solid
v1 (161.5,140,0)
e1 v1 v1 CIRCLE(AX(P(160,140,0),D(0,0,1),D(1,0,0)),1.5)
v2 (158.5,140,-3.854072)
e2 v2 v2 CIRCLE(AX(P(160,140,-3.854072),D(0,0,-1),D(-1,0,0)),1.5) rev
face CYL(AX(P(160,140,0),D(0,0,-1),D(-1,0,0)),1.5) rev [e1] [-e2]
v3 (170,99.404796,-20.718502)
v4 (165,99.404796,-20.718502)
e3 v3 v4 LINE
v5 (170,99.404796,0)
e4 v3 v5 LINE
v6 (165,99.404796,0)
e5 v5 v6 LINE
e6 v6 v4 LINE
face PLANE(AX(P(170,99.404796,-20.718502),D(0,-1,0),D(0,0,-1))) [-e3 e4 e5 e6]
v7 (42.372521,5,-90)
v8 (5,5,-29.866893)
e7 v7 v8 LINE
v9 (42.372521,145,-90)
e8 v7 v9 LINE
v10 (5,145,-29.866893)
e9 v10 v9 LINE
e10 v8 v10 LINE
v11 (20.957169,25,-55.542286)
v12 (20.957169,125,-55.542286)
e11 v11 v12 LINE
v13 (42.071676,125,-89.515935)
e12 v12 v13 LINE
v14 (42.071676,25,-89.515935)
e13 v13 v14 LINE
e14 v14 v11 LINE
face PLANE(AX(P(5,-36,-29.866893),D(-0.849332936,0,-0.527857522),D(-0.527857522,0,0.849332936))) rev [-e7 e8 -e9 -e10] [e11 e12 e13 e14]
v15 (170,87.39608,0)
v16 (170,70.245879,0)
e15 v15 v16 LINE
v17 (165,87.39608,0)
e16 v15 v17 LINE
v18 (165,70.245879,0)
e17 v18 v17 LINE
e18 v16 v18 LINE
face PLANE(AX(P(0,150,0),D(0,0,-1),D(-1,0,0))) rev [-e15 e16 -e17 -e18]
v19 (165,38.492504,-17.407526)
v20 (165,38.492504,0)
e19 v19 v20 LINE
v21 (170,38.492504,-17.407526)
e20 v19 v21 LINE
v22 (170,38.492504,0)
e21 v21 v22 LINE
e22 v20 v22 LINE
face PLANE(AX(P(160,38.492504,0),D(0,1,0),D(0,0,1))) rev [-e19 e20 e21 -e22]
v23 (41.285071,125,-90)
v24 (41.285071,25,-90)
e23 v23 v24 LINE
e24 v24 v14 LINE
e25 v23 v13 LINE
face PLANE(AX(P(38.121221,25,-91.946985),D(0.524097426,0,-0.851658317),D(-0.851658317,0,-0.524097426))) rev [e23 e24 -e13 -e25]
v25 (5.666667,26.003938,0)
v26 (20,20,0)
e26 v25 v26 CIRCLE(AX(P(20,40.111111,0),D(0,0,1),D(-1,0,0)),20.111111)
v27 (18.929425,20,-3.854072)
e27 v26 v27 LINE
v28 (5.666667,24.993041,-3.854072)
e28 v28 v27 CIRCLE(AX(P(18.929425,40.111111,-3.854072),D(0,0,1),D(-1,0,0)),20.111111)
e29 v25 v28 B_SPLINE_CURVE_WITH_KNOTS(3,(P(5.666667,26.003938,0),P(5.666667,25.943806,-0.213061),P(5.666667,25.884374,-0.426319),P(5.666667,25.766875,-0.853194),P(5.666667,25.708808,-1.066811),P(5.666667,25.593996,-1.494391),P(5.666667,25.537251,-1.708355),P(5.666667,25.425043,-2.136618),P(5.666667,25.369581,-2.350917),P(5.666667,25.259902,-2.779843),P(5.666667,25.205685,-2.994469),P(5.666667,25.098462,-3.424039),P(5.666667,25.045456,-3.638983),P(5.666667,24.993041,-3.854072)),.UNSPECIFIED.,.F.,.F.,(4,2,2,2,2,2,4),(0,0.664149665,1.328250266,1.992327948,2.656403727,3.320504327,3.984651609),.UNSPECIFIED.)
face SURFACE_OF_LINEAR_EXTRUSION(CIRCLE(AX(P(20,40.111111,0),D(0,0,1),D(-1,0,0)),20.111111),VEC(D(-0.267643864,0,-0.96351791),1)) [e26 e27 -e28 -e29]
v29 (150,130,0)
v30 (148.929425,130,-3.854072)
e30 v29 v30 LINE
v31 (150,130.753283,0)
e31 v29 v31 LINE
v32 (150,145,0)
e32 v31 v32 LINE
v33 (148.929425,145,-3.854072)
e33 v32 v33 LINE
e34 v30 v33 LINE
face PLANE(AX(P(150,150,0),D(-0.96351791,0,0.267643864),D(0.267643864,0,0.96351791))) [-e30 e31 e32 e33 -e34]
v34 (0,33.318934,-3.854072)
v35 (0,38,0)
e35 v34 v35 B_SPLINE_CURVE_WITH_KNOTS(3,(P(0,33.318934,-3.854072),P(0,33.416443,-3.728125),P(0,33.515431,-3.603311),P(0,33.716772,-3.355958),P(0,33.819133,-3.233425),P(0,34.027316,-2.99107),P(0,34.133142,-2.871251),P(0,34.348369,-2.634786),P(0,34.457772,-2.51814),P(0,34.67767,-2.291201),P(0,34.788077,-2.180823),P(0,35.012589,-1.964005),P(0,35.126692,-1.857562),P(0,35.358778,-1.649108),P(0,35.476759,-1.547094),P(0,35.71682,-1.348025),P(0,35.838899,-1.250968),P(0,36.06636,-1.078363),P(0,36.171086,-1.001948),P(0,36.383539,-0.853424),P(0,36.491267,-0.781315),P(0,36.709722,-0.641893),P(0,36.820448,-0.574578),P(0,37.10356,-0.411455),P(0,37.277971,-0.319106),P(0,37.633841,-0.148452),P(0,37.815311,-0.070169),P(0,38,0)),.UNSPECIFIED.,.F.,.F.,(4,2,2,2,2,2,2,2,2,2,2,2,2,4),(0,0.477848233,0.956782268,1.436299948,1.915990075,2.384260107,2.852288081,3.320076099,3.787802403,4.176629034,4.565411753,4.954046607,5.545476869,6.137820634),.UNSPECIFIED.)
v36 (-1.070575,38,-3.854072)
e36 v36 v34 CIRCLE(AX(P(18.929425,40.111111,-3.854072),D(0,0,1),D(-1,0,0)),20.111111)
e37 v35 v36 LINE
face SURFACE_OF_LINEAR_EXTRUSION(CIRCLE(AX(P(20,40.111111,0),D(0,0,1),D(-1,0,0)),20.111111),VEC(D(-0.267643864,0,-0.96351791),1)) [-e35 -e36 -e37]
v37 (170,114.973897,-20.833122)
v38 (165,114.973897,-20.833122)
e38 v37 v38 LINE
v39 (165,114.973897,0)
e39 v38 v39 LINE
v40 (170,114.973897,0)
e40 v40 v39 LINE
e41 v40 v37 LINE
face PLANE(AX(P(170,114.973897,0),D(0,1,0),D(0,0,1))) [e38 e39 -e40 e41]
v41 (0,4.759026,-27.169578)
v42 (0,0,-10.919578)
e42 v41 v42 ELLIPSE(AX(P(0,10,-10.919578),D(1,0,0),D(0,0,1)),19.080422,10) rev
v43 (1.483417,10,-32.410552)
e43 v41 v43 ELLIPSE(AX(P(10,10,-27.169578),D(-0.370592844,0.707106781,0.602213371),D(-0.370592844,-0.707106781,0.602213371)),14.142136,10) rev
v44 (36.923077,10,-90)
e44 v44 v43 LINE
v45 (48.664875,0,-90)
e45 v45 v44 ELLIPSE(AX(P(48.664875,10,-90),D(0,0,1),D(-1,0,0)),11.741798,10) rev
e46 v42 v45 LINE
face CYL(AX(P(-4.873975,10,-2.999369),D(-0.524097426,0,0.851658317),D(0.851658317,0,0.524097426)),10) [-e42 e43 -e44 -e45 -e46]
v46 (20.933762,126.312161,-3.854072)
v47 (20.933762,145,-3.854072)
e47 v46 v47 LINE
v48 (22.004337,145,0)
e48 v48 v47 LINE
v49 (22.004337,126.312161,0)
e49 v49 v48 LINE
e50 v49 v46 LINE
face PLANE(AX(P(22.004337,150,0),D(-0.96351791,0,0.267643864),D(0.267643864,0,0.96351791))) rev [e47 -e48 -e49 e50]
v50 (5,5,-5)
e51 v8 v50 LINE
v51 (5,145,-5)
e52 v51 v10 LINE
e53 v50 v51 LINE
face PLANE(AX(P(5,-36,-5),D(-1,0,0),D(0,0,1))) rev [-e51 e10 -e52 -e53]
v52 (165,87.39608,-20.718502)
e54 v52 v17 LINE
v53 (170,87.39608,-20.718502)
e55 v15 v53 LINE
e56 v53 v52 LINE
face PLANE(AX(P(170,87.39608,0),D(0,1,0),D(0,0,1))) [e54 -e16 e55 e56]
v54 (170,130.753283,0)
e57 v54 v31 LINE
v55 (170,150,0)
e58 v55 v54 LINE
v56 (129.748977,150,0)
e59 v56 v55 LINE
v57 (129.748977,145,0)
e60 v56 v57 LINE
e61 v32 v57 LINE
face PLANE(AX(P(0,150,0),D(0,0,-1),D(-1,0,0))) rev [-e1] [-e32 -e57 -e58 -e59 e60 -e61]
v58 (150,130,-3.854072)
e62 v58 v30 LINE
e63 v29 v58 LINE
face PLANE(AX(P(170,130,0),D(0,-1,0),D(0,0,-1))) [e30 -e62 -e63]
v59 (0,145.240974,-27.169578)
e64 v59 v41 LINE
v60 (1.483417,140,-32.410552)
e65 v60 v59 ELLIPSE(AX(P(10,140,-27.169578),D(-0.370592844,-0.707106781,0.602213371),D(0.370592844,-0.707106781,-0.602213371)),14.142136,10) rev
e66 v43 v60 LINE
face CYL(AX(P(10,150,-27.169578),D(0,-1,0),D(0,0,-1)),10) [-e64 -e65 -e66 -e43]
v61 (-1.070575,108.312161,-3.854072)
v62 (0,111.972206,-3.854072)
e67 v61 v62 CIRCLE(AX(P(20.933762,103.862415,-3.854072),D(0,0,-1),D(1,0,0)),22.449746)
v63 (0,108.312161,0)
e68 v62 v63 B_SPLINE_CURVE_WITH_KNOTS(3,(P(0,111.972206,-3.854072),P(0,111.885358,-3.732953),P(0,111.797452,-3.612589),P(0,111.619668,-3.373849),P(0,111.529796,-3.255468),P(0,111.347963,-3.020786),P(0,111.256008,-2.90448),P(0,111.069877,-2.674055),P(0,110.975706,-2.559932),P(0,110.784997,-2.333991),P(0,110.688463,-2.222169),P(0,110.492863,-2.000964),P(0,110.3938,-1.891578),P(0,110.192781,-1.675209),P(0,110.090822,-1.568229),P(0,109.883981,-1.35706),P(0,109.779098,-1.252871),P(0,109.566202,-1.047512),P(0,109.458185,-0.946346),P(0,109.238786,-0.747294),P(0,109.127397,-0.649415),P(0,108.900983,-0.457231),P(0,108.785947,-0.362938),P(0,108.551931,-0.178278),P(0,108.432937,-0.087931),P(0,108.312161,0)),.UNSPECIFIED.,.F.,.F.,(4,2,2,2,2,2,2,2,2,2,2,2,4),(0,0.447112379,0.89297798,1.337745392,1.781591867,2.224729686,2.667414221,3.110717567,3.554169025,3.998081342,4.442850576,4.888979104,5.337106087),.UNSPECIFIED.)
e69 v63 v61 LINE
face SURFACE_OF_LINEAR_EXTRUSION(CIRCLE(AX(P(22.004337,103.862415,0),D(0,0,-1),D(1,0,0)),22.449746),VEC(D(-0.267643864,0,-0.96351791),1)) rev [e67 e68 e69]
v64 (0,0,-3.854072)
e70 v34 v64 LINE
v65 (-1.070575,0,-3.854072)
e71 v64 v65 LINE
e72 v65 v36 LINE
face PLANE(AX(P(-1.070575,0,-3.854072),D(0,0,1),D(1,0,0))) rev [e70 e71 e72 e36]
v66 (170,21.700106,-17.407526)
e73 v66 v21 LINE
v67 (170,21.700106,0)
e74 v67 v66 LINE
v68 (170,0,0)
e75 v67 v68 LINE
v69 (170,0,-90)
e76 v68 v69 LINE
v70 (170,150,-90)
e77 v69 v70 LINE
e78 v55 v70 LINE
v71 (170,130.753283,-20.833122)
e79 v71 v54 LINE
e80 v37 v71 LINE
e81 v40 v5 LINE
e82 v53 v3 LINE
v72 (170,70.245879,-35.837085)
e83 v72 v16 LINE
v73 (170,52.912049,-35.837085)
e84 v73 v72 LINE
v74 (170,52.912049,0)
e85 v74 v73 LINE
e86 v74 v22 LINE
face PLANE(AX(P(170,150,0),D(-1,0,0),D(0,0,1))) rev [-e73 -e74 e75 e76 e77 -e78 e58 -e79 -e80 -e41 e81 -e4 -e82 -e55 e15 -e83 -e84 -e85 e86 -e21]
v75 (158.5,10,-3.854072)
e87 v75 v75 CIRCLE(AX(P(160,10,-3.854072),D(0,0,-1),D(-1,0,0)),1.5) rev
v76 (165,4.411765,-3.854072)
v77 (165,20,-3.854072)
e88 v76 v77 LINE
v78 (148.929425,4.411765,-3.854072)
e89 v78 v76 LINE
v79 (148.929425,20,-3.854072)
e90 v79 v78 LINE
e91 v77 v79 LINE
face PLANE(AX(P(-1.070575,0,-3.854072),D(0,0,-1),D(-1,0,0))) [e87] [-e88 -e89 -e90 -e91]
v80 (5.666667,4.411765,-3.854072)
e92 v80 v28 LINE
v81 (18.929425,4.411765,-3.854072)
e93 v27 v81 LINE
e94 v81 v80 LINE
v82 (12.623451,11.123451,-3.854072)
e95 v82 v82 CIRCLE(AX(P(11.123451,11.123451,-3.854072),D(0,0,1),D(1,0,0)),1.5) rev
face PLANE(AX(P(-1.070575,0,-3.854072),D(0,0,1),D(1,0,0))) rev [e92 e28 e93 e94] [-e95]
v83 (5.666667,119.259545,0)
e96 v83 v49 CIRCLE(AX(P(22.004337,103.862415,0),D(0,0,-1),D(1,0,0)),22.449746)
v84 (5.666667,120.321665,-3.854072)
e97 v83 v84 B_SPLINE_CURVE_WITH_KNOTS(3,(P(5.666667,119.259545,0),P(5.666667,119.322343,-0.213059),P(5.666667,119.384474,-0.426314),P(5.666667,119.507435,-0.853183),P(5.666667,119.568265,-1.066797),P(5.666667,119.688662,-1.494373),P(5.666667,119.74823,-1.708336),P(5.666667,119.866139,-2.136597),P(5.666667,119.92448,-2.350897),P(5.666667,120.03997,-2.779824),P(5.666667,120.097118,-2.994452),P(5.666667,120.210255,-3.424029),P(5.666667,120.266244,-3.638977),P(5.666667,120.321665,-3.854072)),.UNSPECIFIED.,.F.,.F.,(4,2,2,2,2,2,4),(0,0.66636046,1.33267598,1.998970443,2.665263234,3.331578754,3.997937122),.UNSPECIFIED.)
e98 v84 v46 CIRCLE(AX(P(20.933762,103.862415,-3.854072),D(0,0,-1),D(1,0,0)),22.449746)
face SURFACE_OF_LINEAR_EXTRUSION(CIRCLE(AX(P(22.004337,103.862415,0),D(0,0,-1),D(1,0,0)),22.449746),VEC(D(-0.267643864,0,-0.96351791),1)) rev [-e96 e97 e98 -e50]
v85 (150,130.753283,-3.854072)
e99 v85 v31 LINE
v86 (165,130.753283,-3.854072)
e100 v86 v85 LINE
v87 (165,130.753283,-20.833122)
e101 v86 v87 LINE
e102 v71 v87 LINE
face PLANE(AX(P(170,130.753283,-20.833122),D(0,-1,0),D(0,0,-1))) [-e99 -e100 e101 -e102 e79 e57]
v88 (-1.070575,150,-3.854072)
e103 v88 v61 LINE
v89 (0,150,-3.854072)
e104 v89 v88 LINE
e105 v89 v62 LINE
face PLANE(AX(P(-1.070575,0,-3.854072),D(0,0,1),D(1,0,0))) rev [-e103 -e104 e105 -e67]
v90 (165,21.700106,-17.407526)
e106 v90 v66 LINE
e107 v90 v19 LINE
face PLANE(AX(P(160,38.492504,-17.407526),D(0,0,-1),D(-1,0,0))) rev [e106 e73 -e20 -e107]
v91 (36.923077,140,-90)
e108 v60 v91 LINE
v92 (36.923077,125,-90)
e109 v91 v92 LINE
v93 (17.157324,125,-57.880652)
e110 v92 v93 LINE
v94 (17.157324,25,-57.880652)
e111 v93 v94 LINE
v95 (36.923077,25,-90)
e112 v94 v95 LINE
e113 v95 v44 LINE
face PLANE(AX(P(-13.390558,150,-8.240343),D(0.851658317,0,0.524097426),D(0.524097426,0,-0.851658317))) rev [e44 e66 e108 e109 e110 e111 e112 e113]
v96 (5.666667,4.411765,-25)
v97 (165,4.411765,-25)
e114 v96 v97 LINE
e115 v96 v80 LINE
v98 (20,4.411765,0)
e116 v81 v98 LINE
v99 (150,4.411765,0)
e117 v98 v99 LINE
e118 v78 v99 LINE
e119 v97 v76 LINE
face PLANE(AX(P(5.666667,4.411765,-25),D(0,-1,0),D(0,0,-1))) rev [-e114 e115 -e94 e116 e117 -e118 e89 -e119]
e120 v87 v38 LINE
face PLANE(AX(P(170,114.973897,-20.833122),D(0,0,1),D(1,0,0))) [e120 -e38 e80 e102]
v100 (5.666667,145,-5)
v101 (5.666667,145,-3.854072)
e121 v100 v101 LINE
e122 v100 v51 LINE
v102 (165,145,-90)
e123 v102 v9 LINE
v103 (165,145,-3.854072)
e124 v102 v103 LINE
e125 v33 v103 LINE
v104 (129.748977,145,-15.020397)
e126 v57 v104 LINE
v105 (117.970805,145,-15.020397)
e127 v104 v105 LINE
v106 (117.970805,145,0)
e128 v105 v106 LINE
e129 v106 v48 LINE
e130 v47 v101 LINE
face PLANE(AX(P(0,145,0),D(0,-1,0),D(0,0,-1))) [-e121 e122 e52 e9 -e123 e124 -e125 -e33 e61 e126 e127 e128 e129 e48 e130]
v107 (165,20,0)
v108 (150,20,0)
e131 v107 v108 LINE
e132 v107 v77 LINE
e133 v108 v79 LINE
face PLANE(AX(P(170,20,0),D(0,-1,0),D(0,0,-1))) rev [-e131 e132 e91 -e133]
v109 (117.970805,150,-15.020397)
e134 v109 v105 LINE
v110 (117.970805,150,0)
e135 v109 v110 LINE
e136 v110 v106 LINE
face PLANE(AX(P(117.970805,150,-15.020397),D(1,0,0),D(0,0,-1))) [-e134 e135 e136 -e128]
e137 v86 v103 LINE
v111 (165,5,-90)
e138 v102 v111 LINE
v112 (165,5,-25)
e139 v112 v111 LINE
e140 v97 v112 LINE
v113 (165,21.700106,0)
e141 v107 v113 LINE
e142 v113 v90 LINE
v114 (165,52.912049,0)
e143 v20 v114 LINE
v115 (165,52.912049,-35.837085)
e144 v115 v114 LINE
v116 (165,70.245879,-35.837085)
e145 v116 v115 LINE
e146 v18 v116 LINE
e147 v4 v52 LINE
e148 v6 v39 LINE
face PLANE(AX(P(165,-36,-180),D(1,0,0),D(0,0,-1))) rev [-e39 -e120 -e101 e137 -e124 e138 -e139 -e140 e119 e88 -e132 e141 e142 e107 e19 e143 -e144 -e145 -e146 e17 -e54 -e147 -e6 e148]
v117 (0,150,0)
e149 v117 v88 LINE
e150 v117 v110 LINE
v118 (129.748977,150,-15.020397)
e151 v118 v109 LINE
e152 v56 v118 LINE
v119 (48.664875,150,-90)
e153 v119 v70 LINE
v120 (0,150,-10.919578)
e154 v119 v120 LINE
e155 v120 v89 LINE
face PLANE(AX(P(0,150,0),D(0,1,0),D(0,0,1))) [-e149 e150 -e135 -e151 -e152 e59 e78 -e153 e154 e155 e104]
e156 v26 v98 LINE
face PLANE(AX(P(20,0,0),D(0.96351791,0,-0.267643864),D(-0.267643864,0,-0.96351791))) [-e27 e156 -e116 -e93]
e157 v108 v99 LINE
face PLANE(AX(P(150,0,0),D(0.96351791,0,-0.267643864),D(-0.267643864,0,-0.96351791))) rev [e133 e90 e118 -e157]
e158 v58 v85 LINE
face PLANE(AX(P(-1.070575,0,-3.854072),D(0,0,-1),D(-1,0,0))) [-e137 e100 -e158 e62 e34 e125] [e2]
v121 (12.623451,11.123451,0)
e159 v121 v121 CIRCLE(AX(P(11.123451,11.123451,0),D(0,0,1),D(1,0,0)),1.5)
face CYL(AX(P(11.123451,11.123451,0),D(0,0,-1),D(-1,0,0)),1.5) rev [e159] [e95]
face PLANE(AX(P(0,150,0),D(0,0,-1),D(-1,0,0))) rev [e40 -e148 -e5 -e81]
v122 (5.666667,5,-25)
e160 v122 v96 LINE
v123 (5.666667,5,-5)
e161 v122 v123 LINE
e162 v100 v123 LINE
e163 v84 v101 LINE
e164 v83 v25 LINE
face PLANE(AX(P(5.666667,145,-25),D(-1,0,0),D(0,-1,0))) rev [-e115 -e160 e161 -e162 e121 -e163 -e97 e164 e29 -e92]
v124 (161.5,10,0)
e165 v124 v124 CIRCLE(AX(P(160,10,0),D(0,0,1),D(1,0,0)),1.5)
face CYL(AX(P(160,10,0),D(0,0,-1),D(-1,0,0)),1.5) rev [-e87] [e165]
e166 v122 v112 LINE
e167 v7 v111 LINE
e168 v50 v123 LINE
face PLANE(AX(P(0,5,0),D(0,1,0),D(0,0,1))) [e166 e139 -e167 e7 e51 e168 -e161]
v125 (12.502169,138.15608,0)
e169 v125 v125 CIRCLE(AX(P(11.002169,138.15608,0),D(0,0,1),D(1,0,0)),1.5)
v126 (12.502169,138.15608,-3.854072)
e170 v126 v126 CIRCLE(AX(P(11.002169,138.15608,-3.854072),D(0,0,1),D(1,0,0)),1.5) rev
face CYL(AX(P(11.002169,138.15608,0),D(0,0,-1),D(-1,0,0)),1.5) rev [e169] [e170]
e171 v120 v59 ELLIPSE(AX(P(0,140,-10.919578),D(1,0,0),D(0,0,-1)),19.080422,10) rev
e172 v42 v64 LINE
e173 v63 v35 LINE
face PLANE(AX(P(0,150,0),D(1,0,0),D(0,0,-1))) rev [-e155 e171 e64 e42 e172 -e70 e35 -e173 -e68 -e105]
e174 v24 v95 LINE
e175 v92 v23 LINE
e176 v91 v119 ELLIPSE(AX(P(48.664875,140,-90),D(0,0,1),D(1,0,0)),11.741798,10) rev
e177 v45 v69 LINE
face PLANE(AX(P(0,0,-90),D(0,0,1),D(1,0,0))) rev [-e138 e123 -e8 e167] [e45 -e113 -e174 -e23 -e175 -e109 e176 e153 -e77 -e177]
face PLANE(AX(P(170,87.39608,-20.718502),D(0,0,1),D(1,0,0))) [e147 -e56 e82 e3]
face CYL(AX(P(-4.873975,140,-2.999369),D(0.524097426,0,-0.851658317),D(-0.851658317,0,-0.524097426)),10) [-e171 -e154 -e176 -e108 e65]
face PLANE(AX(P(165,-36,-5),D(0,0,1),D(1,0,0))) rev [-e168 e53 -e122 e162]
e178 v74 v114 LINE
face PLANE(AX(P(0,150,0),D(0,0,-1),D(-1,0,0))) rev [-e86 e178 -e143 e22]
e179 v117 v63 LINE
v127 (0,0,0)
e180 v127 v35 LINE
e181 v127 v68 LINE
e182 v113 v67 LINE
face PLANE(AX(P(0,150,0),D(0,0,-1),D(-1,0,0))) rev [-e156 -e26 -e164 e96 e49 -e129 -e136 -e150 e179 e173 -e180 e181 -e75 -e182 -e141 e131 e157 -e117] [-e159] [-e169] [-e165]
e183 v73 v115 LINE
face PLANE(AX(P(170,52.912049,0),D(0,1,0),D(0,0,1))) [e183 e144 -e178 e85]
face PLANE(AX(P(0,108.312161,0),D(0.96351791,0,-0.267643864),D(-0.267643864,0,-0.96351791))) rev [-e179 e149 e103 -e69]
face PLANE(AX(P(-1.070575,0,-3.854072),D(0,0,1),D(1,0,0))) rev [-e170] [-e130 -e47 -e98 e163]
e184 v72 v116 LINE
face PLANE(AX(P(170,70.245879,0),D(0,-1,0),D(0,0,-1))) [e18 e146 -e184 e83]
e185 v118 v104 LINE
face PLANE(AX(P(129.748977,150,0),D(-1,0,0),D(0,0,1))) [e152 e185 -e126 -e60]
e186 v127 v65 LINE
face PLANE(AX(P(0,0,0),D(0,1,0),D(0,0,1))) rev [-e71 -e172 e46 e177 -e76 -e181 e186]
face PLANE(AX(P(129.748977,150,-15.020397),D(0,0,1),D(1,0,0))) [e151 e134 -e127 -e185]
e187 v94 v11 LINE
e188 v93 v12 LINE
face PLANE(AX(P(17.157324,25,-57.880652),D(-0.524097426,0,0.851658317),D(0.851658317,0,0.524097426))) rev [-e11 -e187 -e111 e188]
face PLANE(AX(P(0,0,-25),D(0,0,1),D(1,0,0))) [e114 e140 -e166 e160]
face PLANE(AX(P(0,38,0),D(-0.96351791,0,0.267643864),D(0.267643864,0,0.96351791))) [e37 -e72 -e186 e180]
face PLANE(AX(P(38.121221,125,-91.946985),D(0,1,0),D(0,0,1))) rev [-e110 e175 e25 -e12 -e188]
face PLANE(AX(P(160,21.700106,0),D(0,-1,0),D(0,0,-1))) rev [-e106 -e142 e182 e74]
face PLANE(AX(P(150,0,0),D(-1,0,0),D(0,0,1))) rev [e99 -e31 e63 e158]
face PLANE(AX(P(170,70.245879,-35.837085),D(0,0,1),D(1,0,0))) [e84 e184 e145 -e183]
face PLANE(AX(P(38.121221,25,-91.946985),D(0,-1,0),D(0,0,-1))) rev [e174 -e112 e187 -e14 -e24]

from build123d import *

# Parameters (mm, degrees)
ESBO_O1_W                  = 170
ESBO_O1_H                  = 30
RESSALTO_EXTRUS_O1_DEPTH   = 150
CORTE_EXTRUS_O1_DEPTH      = 222
CORTE_EXTRUS_O1_DEPTH_BACK = 36
RESSALTO_EXTRUS_O2_DEPTH   = 5
RESSALTO_EXTRUS_O3_DEPTH   = 5
ESBO_O4_W                  = 159.333333333
ESBO_O4_H                  = 140.588235294
CORTE_EXTRUS_O2_DEPTH      = 25
CORTE_EXTRUS_O3_DEPTH      = 31
CORTE_EXTRUS_O4_DEPTH      = 42
FILETE1_R                  = 10
CORTE_EXTRUS_O5_DEPTH      = 32
CORTE_EXTRUS_O6_START      = -15.72292277
CORTE_EXTRUS_O6_OUTLINE_R  = 3.95
CORTE_EXTRUS_O6_DEPTH      = 4.876648775
CORTE_EXTRUS_O7_START      = -132.751356438
CORTE_EXTRUS_O7_OUTLINE_R  = 3.95
CORTE_EXTRUS_O7_DEPTH      = 3.479370229
RESSALTO_EXTRUS_O6_DEPTH   = 17
RESSALTO_EXTRUS_O7_DEPTH   = 4
CORTE_EXTRUS_O8_DEPTH      = 21
F_3DSKETCH12_R             = 1.5
CORTE_EXTRUS_O9_DEPTH      = 14
CORTE_EXTRUS_O10_DEPTH     = 19
ESBO_O11_W                 = 17.407525744
ESBO_O11_H                 = 16.792397695
CORTE_EXTRUS_O11_DEPTH     = 10
CORTE_EXTRUS_O12_DEPTH     = 20
CORTE_EXTRUS_O13_DEPTH     = 14
CORTE_EXTRUS_O14_DEPTH     = 131


# Read off the part's stored shape, not the designer's step: Corte-extrusão6, Corte-extrusão7
with BuildPart() as part:
    # Esboço1 → Ressalto-extrusão1 (new body)
    with BuildSketch(Plane(origin=(0, 0, 0), x_dir=(1, 0, 0), z_dir=(0, 1, 0))):
        with Locations((85, 15)):
            Rectangle(ESBO_O1_W, ESBO_O1_H)
        Polygon((80, 160), (0, 30), (170, 30), (170, 160), align=None)
        Polygon((170, 160), (170, 185), (80, 160), align=None)
    extrude(amount=RESSALTO_EXTRUS_O1_DEPTH)

    # Esboço2 → Corte-extrusão1 (cut, two sides: drawn at the far end of the back side and taken through both)
    with BuildSketch(Plane(origin=(0, 0, 0), x_dir=(1, 0, 0), z_dir=(0, 1, 0)).offset(-CORTE_EXTRUS_O1_DEPTH_BACK)):
        Polygon((84.391050739, 157.608625205), (165, 180), (165, 5), (5, 5), (5, 29.866892941), align=None)
    extrude(amount=CORTE_EXTRUS_O1_DEPTH + CORTE_EXTRUS_O1_DEPTH_BACK, mode=Mode.SUBTRACT)

    # Esboço3 → Ressalto-extrusão2 (add)
    with BuildSketch(Plane(origin=(0, 0, 0), x_dir=(1, 0, 0), z_dir=(0, 1, 0))):
        Polygon((84.391050739, 157.608625205), (165, 180), (165, 5), (5, 5), (5, 29.866892941), align=None)
    extrude(amount=RESSALTO_EXTRUS_O2_DEPTH)

    # 3DSketch2 → Ressalto-extrusão3 (add)
    with BuildSketch(Plane(origin=(165, 150, -5), x_dir=(0, 0, -1), z_dir=(0, 1, 0))):
        Polygon((0, 0), (0, 160), (24.866892941, 160), (152.608625205, 80.608949261), (175, 0), align=None)
    extrude(amount=-RESSALTO_EXTRUS_O3_DEPTH)

    # Esboço4 → Corte-extrusão2 (cut)
    with BuildSketch(Plane.XY):
        with Locations((85.333333333, 74.705882353)):
            Rectangle(ESBO_O4_W, ESBO_O4_H)
    extrude(amount=-CORTE_EXTRUS_O2_DEPTH, mode=Mode.SUBTRACT)

    # 3DSketch3 → Corte-extrusão3 (cut)
    with BuildSketch(Plane(origin=(74.759025743, 90, -151.483416833), x_dir=(-0.29071694485714406, -0.8320502943378435, 0.4724150353928592), z_dir=(-0.8516583167045438, 0, -0.5240974256643346))):
        Polygon((0, 0), (22.188007849, 33.282011774), (72.111025509, 0), (49.92301766, -33.282011774), align=None)
    extrude(amount=-CORTE_EXTRUS_O3_DEPTH, mode=Mode.SUBTRACT)

    # 3DSketch4 → Corte-extrusão4 (cut)
    with BuildSketch(Plane(origin=(69.518051487, 130, -142.966833666), x_dir=(-0.37059284368967266, -0.7071067811865471, 0.6022133709956982), z_dir=(0.8516583167045362, 0, 0.5240974256643472))):
        Polygon((0, 0), (14.142135624, -14.142135624), (28.284271247, 0), (14.142135624, 14.142135624), align=None)
    extrude(amount=CORTE_EXTRUS_O4_DEPTH, mode=Mode.SUBTRACT)

    # Filete1
    filete1_edges = [part.edges().sort_by_distance(p)[0] for p in [
        (170, 75, -185),
        (125, 0, -172.5),
        (125, 150, -172.5),
        (80, 75, -160),
        (40, 0, -95),
        (40, 150, -95),
        (0, 75, -30),
        (84.391050739, 75, -157.608625205),
    ]]
    fillet(filete1_edges, radius=FILETE1_R)

    # 3DSketch5 → Corte-extrusão5 (cut)
    with BuildSketch(Plane(origin=(38.121221288, 25, -91.946984593), x_dir=(-0.194644897392922, 0.9284766908852593, 0.31629795826349816), z_dir=(0.851658316704544, 0, 0.5240974256643347))):
        Polygon((0, 0), (14.855627054, 37.139067635), (107.703296143, 0), (92.847669089, -37.139067635), align=None)
    extrude(amount=CORTE_EXTRUS_O5_DEPTH, mode=Mode.SUBTRACT)

    # Corte-extrusão6 outline → Corte-extrusão6 (cut)
    with BuildSketch(Plane(origin=(0, 0, 0), x_dir=(0.5240974256643349, 0, -0.8516583167045437), z_dir=(0.8516583167045437, 0, 0.5240974256643349)).offset(CORTE_EXTRUS_O6_START)):
        with Locations((148.193124726, 20)):
            Circle(CORTE_EXTRUS_O6_OUTLINE_R)
    extrude(amount=CORTE_EXTRUS_O6_DEPTH, mode=Mode.SUBTRACT)

    # Corte-extrusão7 outline → Corte-extrusão7 (cut)
    with BuildSketch(Plane(origin=(0, 0, 0), x_dir=(0.9635179096299408, 0, -0.267643863786094), z_dir=(0.267643863786094, 0, 0.9635179096299409)).offset(CORTE_EXTRUS_O7_START)):
        with Locations((161.993020775, 122.164347625)):
            Circle(CORTE_EXTRUS_O7_OUTLINE_R)
    extrude(amount=CORTE_EXTRUS_O7_DEPTH, mode=Mode.SUBTRACT)

    # 3DSketch9 → Ressalto-extrusão6 (add)
    with BuildSketch(Plane(origin=(76.350750718, 26, -154.069969916), x_dir=(-0.29815073011621673, 0.8224176546598938, 0.4844949364388514), z_dir=(0.8516583167045438, 0, 0.5240974256643349))):
        Polygon((0, 0), (26.758649409, 38.684123705), (82.683049926, 0), (55.924400517, -38.684123705), align=None)
        Polygon((5.017416454, 0.222210211), (27.772783339, 33.118916398), (77.117842619, -1.01413393), (54.362475733, -33.910840117), align=None, mode=Mode.SUBTRACT)
    extrude(amount=RESSALTO_EXTRUS_O6_DEPTH)

    # 3DSketch10 → Ressalto-extrusão7 (add, along a direction that is not the sketch's normal)
    with BuildSketch(Plane(origin=(0, 0, 0), x_dir=(0.7498378553650926, 0.6616216370868463, 0), z_dir=(0, 0, 1))):
        with BuildLine():
            Line((0, 0), (14.996757107, -13.232432742))
            Line((14.996757107, -13.232432742), (28.229189849, 1.764324366))
            ThreePointArc((28.229189849, 1.764324366), (21.556867541, 14.536675999), (25.141622209, 28.493838504))
            Line((25.141622209, 28.493838504), (13.232432742, 14.996757107))
            Line((13.232432742, 14.996757107), (0, 0))
        make_face()
        with BuildLine():
            Line((99.243245563, 112.475678305), (115.742930564, 97.917132715))
            Line((115.742930564, 97.917132715), (100.070543679, 80.155094246))
            ThreePointArc((100.070543679, 80.155094246), (86.055529464, 85.755516688), (71.66166921, 81.216558438))
            Line((71.66166921, 81.216558438), (83.570858678, 94.713639835))
            Line((83.570858678, 94.713639835), (99.243245563, 112.475678305))
        make_face()
        Polygon((226.715680975, 0), (211.718923868, 13.232432742), (198.486491126, -1.764324366), (213.483248233, -14.996757107), align=None)
        Polygon((127.472435412, -112.475678305), (112.475678305, -99.243245563), (125.708111047, -84.246488456), (140.704868154, -97.478921197), align=None)
    extrude(amount=-RESSALTO_EXTRUS_O7_DEPTH, dir=(0.26764386378609445, 0, 0.9635179096299407))

    # 3DSketch11 → Corte-extrusão8 (cut)
    with BuildSketch(Plane(origin=(153.100052242, 17.26943239, -180.305570067), x_dir=(-0.07376023038027929, 0.9970655099962036, 0.02048895288341091), z_dir=(0.2676438637860946, 0, 0.9635179096299407))):
        Polygon((0, 0), (0.269964353, 3.516152018), (46.066103253, 0), (45.7961389, -3.516152018), align=None)
    extrude(amount=CORTE_EXTRUS_O8_DEPTH, mode=Mode.SUBTRACT)

    # 3DSketch12 → Corte-extrusão9 (cut)
    with BuildSketch(Plane(origin=(160, 140, 0), x_dir=(-0.7560654573770964, -0.6544960077503622, 0), z_dir=(0, 0, 1))):
        with Locations(Location((0, 0, 0), (0, 0, 319.118554366))):
            Circle(F_3DSKETCH12_R)
        with Locations(Location((85.084481008, 98.288509459, 0), (0, 0, 319.118554366))):
            Circle(F_3DSKETCH12_R)
        with Locations(Location((113.858951537, -96.124361942, 0), (0, 0, 139.118554366))):
            Circle(F_3DSKETCH12_R)
        with Locations(Location((196.909602971, 0, 0), (0, 0, 139.118554366))):
            Circle(F_3DSKETCH12_R)
    extrude(amount=-CORTE_EXTRUS_O9_DEPTH, mode=Mode.SUBTRACT)

    # 3DSketch13 → Corte-extrusão10 (cut)
    with BuildSketch(Plane(origin=(170, 70.245878967, 0), x_dir=(0, -0.4354246522459521, -0.9002251786172678), z_dir=(-1, 0, 0))):
        Polygon((0, 0), (32.261446294, -15.604350297), (39.809023237, 0), (7.547576943, 15.604350297), align=None)
    extrude(amount=CORTE_EXTRUS_O10_DEPTH, mode=Mode.SUBTRACT)

    # Esboço11 → Corte-extrusão11 (cut)
    with BuildSketch(Plane(origin=(170, 0, 0), x_dir=(0, 0, -1), z_dir=(1, 0, 0))):
        with Locations((8.703762872, 30.096304842)):
            Rectangle(ESBO_O11_W, ESBO_O11_H)
    extrude(amount=-CORTE_EXTRUS_O11_DEPTH, mode=Mode.SUBTRACT)

    # 3DSketch14 → Corte-extrusão12 (cut)
    with BuildSketch(Plane(origin=(170, 87.396079578, 0), x_dir=(0, -0.09341146144778735, -0.9956275904524686), z_dir=(1, 0, 0))):
        Polygon((0, 0), (20.627912038, 1.935345533), (19.506160301, 13.891554783), (-1.121751737, 11.956209249), align=None)
        Polygon((-2.576084268, 27.457236328), (18.165947056, 29.403288726), (16.691971594, 45.113680317), (-4.050059731, 43.167627919), align=None)
        Polygon((91.534016736, 10.656116635), (99.096194716, 11.679615344), (100.676965661, 0), (93.114787682, -1.02349871), align=None)
    extrude(amount=-CORTE_EXTRUS_O12_DEPTH, mode=Mode.SUBTRACT)

    # 3DSketch15 → Corte-extrusão13 (cut)
    with BuildSketch(Plane(origin=(129.748977416, 150, 0), x_dir=(-0.6170578351280018, 0, -0.7869178026370631), z_dir=(0, -1, 0))):
        Polygon((0, 0), (11.819817446, 9.268453377), (19.087630878, 0), (7.267813432, -9.268453377), align=None)
    extrude(amount=CORTE_EXTRUS_O13_DEPTH, mode=Mode.SUBTRACT)

    # 3DSketch16 → Corte-extrusão14 (cut, along a direction that is not the sketch's normal)
    with BuildSketch(Plane(origin=(-4.487914591, 154.677224746, -90), x_dir=(0.7478301848964537, -0.6638900621019538, 0), z_dir=(0, 0, 1))):
        Polygon((0, 0), (133.725190167, 118.715219842), (239.115232272, 0), (105.390042105, -118.715219842), align=None)
    extrude(amount=-CORTE_EXTRUS_O14_DEPTH, dir=(-0.5240974256643347, 0, 0.8516583167045438), mode=Mode.SUBTRACT)


solid = part.part
